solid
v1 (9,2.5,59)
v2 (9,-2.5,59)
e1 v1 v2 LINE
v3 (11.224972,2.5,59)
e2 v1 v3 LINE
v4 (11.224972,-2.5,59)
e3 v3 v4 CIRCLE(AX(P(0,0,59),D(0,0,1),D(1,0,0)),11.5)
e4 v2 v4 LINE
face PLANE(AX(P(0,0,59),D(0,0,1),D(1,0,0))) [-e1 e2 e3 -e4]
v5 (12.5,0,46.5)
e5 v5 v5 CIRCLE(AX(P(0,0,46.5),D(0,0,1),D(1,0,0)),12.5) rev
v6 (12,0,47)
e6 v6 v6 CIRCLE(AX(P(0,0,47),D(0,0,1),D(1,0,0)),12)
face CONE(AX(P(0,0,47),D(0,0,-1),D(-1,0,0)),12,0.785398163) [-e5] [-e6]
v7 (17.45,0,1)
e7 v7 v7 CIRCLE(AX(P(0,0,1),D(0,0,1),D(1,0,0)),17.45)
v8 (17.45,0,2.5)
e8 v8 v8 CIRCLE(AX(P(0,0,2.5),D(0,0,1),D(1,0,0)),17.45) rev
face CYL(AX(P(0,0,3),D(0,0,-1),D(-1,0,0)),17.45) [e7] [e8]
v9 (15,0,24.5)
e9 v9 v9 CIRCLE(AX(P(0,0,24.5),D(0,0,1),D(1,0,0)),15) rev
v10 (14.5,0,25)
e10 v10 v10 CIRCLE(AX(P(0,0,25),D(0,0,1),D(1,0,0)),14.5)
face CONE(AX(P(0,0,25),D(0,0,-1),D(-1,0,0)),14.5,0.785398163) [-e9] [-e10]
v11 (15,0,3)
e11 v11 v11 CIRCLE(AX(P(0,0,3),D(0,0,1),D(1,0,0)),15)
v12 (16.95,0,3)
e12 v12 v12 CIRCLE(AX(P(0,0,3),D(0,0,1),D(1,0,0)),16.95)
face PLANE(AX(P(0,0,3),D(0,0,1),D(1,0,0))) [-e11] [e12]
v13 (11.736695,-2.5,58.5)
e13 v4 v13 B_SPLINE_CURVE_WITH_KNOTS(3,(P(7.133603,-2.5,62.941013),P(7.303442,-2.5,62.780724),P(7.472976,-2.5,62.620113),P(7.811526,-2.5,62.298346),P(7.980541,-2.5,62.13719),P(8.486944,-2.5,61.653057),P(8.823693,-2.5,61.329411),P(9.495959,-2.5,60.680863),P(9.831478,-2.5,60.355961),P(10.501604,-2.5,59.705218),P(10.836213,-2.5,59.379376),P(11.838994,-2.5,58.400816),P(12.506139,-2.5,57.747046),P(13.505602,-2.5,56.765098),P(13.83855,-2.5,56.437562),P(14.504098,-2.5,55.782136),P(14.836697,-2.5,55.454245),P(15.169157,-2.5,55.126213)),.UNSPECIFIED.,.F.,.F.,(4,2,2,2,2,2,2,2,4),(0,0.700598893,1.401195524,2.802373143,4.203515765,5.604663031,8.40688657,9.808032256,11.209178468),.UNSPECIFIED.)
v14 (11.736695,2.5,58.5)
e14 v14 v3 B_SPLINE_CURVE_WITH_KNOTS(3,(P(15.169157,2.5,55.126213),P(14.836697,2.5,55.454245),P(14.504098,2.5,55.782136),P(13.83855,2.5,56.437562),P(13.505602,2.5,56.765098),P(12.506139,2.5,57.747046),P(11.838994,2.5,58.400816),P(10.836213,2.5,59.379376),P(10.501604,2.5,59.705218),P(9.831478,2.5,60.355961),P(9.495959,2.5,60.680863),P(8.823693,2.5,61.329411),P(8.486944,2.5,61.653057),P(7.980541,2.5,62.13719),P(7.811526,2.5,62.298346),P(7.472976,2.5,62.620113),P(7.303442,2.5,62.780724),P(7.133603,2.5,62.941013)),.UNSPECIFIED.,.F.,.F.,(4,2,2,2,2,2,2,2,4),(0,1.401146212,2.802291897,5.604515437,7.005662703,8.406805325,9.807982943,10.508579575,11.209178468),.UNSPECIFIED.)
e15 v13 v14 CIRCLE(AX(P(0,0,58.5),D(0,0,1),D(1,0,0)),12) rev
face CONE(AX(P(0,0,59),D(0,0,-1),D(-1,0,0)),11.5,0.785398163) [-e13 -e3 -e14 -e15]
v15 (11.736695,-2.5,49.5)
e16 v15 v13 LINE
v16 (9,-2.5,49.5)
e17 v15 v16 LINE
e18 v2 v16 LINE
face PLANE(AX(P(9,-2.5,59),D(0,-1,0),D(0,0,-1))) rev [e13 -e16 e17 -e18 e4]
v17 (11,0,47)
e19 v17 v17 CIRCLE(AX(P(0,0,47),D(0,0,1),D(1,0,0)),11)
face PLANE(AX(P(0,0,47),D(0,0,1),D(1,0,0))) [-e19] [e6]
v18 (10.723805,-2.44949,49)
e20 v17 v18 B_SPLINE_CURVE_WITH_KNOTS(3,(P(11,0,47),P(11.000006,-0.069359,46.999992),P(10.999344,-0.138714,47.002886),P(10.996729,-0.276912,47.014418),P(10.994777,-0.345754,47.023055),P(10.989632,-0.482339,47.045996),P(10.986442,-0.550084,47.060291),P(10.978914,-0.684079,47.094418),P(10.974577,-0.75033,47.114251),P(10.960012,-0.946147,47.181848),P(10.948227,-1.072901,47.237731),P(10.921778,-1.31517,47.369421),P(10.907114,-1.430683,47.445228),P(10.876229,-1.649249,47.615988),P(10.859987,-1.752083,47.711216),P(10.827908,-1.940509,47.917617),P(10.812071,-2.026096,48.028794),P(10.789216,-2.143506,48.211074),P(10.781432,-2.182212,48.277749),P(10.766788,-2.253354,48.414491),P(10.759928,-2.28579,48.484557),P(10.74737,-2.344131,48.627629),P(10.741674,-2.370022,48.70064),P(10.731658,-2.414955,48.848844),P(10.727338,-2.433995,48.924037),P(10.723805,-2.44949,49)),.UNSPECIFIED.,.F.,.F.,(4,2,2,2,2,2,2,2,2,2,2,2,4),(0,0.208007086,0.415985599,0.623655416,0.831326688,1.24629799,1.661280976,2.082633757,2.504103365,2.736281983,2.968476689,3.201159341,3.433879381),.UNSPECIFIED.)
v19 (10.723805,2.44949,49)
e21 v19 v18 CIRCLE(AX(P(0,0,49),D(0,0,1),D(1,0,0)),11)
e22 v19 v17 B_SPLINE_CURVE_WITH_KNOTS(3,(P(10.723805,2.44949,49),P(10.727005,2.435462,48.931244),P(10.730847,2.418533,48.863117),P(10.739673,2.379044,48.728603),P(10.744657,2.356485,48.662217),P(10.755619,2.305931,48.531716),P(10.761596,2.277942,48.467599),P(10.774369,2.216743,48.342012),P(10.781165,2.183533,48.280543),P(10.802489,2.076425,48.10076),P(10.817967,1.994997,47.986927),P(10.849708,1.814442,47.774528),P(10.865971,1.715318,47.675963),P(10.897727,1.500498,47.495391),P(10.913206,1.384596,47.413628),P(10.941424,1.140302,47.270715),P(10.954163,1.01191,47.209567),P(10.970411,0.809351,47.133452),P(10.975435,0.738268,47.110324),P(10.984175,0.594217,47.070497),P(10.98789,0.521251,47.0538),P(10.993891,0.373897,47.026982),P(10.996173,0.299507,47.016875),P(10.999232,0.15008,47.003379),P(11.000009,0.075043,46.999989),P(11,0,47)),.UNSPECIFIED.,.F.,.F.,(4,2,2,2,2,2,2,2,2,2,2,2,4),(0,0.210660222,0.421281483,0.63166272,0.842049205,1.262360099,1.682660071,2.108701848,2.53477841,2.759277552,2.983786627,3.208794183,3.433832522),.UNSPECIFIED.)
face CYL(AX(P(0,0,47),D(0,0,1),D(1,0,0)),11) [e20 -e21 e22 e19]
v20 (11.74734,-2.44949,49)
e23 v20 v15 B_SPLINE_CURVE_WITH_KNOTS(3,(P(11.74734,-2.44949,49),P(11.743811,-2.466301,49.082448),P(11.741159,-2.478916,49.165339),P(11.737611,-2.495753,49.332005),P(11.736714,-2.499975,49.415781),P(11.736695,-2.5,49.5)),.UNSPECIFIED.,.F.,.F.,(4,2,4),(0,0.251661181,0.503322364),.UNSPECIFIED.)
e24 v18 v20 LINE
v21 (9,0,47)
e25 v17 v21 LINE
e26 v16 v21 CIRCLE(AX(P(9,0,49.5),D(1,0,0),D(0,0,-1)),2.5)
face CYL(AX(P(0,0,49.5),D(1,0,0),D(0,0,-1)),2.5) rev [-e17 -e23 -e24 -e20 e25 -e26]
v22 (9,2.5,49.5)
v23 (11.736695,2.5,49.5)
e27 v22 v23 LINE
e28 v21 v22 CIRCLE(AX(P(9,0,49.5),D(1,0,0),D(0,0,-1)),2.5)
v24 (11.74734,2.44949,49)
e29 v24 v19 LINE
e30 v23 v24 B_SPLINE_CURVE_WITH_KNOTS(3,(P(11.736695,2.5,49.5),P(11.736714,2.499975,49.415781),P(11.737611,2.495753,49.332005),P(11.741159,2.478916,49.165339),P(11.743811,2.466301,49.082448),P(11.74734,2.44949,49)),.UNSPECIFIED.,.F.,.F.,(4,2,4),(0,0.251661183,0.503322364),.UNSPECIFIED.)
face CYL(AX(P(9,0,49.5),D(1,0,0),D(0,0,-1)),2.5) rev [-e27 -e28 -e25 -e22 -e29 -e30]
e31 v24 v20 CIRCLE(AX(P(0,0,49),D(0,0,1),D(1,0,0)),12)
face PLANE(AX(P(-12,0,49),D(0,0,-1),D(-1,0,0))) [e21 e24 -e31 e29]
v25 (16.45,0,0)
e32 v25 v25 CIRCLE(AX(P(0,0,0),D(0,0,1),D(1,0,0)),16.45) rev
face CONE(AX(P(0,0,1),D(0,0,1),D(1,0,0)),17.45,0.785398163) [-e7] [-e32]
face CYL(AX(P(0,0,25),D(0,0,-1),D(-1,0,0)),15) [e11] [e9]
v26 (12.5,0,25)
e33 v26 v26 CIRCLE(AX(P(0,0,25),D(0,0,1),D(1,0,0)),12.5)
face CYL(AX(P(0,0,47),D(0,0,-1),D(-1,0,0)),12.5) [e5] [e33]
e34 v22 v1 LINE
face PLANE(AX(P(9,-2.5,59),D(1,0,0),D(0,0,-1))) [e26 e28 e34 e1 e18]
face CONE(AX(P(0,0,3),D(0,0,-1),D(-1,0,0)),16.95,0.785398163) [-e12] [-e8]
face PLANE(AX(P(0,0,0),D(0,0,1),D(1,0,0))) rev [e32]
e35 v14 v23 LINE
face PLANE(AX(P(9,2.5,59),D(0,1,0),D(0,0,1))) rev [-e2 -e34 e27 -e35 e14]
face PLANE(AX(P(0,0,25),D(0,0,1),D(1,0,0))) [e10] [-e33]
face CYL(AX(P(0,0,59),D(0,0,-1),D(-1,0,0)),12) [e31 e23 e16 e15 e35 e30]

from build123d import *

# Parameters (mm, degrees)
SKETCH_1_R          = 17.45
EXTRUDE_1_DEPTH     = 3
SKETCH_2_R          = 15
EXTRUDE_2_DEPTH     = 22
SKETCH_4_R          = 12.5
EXTRUDE_3_DEPTH     = 22
SKETCH_5_R          = 12
EXTRUDE_4_DEPTH     = 12
CHAMFER_1_SIZE      = 0.5
SKETCH_6_W          = 1
SKETCH_6_H          = 2
CHAMFER_2_SIZE      = 0.5
CHAMFER_3_SIZE      = 1
SKETCH_7_W          = 12
SKETCH_7_H          = 5
CUT_EXTRUDE_1_DEPTH = 3
FILLET_1_R          = 2.5


with BuildPart() as part:
    # 草图1 → 拉伸1 (new body)
    with BuildSketch(Plane.XY):
        Circle(SKETCH_1_R)
    extrude(amount=EXTRUDE_1_DEPTH)

    # 草图2 → 拉伸2 (add)
    with BuildSketch(Plane.XY.offset(3)):
        Circle(SKETCH_2_R)
    extrude(amount=EXTRUDE_2_DEPTH)

    # 草图4 → 拉伸3 (add)
    with BuildSketch(Plane.XY.offset(25)):
        Circle(SKETCH_4_R)
    extrude(amount=EXTRUDE_3_DEPTH)

    # 草图5 → 拉伸4 (add)
    with BuildSketch(Plane.XY.offset(47)):
        Circle(SKETCH_5_R)
    extrude(amount=EXTRUDE_4_DEPTH)

    # 倒角1
    chamfer_1_edges = [part.edges().sort_by_distance(p)[0] for p in [
        (-12, 0, 59),
    ]]
    chamfer(chamfer_1_edges, length=CHAMFER_1_SIZE)

    # 草图6 → 切除-旋转1 (revolve, cut)
    with BuildSketch(Plane(origin=(0, 0, 0), x_dir=(1, 0, 0), z_dir=(0, 1, 0)), mode=Mode.PRIVATE) as cut_revolve_1_sk:
        with Locations((-11.5, -48)):
            Rectangle(SKETCH_6_W, SKETCH_6_H)
    revolve(cut_revolve_1_sk.sketch.rotate(Axis((0, 0, 47), (0, 0, -1)), 180), axis=Axis((0, 0, 47), (0, 0, -1)), mode=Mode.SUBTRACT)

    # 倒角2
    chamfer_2_edges = [part.edges().sort_by_distance(p)[0] for p in [
        (-12.5, 0, 47),
        (-17.45, 0, 3),
        (-15, 0, 25),
    ]]
    chamfer(chamfer_2_edges, length=CHAMFER_2_SIZE)

    # 倒角3
    chamfer_3_edges = [part.edges().sort_by_distance(p)[0] for p in [
        (-17.45, 0, 0),
    ]]
    chamfer(chamfer_3_edges, length=CHAMFER_3_SIZE)

    # 草图7 → 切除-拉伸1 (cut)
    with BuildSketch(Plane(origin=(12, 0, 0), x_dir=(0, 0, -1), z_dir=(1, 0, 0))):
        with Locations((-53, 0)):
            Rectangle(SKETCH_7_W, SKETCH_7_H)
    extrude(amount=-CUT_EXTRUDE_1_DEPTH, mode=Mode.SUBTRACT)

    # 圆角1
    # the kernel refuses this fillet: 2.5 mm, written as the material it adds along each edge
    with BuildSketch(Plane(origin=(16.962142643, -2.5, 47), x_dir=(0, 1, 0), z_dir=(-1, 0, 0))) as fillet_1_piece_1_section:
        with BuildLine():
            CenterArc((FILLET_1_R, -FILLET_1_R), FILLET_1_R, 90, 90)
            Line((0, -FILLET_1_R), (0, 0))
            Line((0, 0), (FILLET_1_R, 0))
        make_face()
    fillet_1_piece_1 = extrude(amount=14.212142643, mode=Mode.PRIVATE)
    fillet_1_piece_1 = fillet_1_piece_1 & Plane(origin=(0, 0, 49.124758418), x_dir=(1, 0, 0), z_dir=(0, 0, -1)) * Cylinder(12, 39, mode=Mode.PRIVATE)
    fillet_1_piece_1 = split(fillet_1_piece_1, bisect_by=Plane(origin=(11.227777132, -2.484876178, 49), z_dir=(0, 0, 1)), keep=Keep.TOP, mode=Mode.PRIVATE)
    add(fillet_1_piece_1)
    with BuildSketch(Plane(origin=(16.962142643, -2.5, 47), x_dir=(0, 1, 0), z_dir=(-1, 0, 0))) as fillet_1_piece_2_section:
        with BuildLine():
            CenterArc((FILLET_1_R, -FILLET_1_R), FILLET_1_R, 90, 90)
            Line((0, -FILLET_1_R), (0, 0))
            Line((0, 0), (FILLET_1_R, 0))
        make_face()
    fillet_1_piece_2 = extrude(amount=14.212142643, mode=Mode.PRIVATE)
    fillet_1_piece_2 = fillet_1_piece_2 & Plane(origin=(0, 0, 48.528388409), x_dir=(1, 0, 0), z_dir=(0, 0, 1)) * Cylinder(11, 39, mode=Mode.PRIVATE)
    add(fillet_1_piece_2)
    with BuildSketch(Plane(origin=(16.962142643, 2.5, 47), x_dir=(0, -1, 0), z_dir=(-1, 0, 0))) as fillet_1_piece_3_section:
        with BuildLine():
            CenterArc((FILLET_1_R, FILLET_1_R), FILLET_1_R, 180, 90)
            Line((0, FILLET_1_R), (0, 0))
            Line((0, 0), (FILLET_1_R, 0))
        make_face()
    fillet_1_piece_3 = extrude(amount=14.212142643, mode=Mode.PRIVATE)
    fillet_1_piece_3 = fillet_1_piece_3 & Plane(origin=(0, 0, 49.124758418), x_dir=(1, 0, 0), z_dir=(0, 0, -1)) * Cylinder(12, 39, mode=Mode.PRIVATE)
    fillet_1_piece_3 = split(fillet_1_piece_3, bisect_by=Plane(origin=(11.227777136, 2.484876178, 49), z_dir=(0, 0, 1)), keep=Keep.TOP, mode=Mode.PRIVATE)
    add(fillet_1_piece_3)
    with BuildSketch(Plane(origin=(16.962142643, 2.5, 47), x_dir=(0, -1, 0), z_dir=(-1, 0, 0))) as fillet_1_piece_4_section:
        with BuildLine():
            CenterArc((FILLET_1_R, FILLET_1_R), FILLET_1_R, 180, 90)
            Line((0, FILLET_1_R), (0, 0))
            Line((0, 0), (FILLET_1_R, 0))
        make_face()
    fillet_1_piece_4 = extrude(amount=14.212142643, mode=Mode.PRIVATE)
    fillet_1_piece_4 = fillet_1_piece_4 & Plane(origin=(0, 0, 48.5283884), x_dir=(1, 0, 0), z_dir=(0, 0, 1)) * Cylinder(11, 39, mode=Mode.PRIVATE)
    add(fillet_1_piece_4)


solid = part.part
